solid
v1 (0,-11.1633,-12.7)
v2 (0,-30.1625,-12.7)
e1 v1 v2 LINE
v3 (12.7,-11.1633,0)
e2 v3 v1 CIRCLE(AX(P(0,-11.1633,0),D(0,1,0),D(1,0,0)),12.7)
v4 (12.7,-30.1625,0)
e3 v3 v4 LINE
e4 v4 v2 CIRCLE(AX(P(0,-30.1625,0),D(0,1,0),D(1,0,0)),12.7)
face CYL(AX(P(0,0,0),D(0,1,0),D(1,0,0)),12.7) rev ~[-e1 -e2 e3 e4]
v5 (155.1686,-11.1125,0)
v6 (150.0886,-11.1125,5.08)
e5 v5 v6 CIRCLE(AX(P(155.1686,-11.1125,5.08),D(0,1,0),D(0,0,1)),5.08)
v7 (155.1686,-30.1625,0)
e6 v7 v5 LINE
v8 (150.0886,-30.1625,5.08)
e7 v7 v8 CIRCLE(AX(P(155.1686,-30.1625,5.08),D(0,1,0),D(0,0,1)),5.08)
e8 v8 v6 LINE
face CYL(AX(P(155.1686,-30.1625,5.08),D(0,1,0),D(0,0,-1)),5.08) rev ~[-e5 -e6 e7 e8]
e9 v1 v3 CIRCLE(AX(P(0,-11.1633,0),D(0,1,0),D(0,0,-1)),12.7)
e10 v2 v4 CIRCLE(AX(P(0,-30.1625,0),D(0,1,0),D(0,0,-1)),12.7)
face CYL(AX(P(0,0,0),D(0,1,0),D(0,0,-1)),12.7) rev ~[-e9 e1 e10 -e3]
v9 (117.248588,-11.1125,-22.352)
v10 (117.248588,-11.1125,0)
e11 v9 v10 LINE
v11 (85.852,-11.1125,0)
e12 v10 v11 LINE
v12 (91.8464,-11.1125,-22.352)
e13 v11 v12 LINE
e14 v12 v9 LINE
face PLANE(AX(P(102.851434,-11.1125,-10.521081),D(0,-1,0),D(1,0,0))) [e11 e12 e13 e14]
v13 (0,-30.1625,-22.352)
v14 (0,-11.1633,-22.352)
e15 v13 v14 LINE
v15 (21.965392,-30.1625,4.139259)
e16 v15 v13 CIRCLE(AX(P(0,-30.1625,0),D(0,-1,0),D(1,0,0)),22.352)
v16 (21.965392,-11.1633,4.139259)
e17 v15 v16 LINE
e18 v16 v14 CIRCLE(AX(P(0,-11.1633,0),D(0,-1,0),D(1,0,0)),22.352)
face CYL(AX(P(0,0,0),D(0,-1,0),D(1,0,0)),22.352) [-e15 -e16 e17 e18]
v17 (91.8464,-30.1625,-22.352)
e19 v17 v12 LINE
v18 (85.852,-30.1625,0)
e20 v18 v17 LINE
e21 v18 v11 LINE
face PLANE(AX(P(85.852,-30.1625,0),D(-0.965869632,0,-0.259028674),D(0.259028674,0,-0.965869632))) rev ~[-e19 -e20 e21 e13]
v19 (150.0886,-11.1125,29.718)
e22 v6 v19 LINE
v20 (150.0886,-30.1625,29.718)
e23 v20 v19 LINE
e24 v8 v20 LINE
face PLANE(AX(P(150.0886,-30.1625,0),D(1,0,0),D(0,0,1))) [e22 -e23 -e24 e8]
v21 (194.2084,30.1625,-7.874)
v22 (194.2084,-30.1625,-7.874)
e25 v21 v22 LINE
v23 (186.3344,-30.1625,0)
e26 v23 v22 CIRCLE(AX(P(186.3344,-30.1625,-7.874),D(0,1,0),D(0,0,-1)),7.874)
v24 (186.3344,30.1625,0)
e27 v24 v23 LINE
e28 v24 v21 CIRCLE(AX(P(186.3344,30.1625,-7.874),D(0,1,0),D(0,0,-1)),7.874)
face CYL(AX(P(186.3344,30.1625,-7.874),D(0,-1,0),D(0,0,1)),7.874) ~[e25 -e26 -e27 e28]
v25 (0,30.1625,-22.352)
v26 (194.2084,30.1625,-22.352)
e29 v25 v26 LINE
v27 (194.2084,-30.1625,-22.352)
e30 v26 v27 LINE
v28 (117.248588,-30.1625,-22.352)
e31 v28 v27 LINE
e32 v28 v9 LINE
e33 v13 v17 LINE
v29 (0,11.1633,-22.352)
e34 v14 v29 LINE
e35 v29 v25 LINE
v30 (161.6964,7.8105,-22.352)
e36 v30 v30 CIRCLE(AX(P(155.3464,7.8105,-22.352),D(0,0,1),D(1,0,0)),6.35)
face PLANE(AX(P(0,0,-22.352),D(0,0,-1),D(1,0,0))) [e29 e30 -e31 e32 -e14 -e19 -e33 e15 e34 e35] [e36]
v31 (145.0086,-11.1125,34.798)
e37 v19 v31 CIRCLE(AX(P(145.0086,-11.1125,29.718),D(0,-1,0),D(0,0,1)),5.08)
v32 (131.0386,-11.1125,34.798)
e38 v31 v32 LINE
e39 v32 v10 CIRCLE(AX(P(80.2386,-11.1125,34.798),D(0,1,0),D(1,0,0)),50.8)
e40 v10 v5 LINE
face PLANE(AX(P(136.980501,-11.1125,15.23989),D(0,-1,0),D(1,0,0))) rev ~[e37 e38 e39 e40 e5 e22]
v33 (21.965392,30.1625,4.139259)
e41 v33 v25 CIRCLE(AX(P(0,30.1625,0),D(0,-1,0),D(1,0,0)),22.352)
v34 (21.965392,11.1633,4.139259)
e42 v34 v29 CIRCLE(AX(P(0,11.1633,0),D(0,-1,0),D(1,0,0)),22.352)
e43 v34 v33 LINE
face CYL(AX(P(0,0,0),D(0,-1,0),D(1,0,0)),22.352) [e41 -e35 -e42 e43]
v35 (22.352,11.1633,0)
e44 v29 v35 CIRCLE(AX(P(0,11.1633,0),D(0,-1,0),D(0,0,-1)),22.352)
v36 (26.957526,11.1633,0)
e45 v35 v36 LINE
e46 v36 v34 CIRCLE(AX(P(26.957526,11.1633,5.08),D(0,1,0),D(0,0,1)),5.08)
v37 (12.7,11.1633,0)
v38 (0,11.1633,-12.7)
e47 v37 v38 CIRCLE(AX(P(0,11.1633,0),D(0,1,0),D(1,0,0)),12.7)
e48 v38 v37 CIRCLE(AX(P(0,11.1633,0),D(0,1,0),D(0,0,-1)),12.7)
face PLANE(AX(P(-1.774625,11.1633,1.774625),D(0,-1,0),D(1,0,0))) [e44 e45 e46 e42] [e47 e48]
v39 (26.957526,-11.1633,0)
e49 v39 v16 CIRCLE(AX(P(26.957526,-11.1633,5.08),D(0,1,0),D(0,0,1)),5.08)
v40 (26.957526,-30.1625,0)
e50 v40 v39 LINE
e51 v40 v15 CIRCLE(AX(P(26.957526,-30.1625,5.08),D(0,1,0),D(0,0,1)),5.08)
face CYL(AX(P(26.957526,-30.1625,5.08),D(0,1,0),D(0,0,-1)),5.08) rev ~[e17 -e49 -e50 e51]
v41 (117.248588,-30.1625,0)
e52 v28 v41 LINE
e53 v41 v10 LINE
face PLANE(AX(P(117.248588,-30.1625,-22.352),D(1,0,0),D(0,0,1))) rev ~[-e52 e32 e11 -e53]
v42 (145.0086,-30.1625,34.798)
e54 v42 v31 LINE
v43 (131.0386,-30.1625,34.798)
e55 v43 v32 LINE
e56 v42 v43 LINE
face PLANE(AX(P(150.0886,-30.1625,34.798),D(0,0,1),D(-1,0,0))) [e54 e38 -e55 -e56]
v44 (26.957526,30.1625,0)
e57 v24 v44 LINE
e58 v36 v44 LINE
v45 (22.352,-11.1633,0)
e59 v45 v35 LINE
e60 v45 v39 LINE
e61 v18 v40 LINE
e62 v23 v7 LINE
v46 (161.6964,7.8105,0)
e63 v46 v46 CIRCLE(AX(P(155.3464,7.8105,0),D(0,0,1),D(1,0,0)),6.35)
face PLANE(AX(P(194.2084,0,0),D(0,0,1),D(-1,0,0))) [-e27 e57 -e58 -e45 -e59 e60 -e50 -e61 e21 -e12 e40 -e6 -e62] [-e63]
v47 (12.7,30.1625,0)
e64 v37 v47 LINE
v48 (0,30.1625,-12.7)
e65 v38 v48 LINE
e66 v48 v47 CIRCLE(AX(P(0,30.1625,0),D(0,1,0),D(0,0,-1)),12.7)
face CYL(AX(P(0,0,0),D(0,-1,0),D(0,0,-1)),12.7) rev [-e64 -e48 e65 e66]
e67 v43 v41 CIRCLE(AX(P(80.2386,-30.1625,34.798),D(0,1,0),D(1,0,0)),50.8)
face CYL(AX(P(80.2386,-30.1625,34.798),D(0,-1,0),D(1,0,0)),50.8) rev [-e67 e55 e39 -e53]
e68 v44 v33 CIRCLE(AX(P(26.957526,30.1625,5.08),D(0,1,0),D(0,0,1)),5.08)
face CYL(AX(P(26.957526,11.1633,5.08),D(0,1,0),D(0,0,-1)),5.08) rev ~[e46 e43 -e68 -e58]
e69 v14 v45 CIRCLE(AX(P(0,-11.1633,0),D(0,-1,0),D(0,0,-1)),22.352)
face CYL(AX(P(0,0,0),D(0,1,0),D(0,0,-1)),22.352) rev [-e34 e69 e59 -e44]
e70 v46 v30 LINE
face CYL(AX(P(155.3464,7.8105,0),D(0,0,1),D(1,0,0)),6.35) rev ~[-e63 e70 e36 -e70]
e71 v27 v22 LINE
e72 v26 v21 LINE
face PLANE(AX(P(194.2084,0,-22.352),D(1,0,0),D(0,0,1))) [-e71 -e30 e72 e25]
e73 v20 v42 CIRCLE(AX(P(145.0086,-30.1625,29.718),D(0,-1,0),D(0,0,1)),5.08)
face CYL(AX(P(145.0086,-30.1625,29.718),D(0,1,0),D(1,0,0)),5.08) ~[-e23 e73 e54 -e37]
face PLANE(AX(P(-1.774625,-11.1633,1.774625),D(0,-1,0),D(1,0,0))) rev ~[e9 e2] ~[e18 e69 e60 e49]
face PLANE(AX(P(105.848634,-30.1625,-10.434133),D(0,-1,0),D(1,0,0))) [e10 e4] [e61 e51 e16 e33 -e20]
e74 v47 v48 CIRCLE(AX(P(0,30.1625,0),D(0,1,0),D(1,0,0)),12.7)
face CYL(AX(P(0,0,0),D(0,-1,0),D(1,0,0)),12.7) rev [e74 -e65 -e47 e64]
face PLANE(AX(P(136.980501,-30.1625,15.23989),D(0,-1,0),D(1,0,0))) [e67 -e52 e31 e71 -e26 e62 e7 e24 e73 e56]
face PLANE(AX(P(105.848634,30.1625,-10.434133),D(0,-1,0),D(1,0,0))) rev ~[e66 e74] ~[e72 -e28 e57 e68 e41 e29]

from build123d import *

# Parameters (mm, degrees)
F1_DEPTH = 30.1625
F2_DEPTH = 11.1633
F4_DEPTH = 19.05
F5_DEPTH = 19.05
F6_R     = 7.874
F7_R     = 5.08
F8_R     = 6.35
F9_DEPTH = 22.353


with BuildPart() as f1:
    # F0 (on Front) → F1 (new body, symmetric)
    with BuildSketch(Plane.XZ):
        Polygon((97.8408, -22.352), (117.2485877871, -22.352), (117.2485877871, 0), (91.8464, 0), align=None)
        Polygon((91.8464, -22.352), (91.8464, 0), (85.852, 0), align=None)
        Polygon((64.8810639977, -22.352), (91.8464, -22.352), (85.852, 0), (43.9732931554, 0), align=None)
        with BuildLine():
            Line((0, -22.352), (64.8810639977, -22.352))
            Line((64.8810639977, -22.352), (43.9732931554, 0))
            Line((43.9732931554, 0), (22.352, 0))
            ThreePointArc((22.352, 0), (15.8052507731, -15.8052507731), (0, -22.352))
        make_face()
        with BuildLine():
            ThreePointArc((22.352, 0), (-15.8052507731, 15.8052507731), (0, -22.352))
            Line((0, -22.352), (0, -12.7))
            ThreePointArc((0, -12.7), (-8.9802561211, 8.9802561211), (12.7, 0))
            Line((12.7, 0), (22.352, 0))
        make_face()
        Polygon((91.8464, -22.352), (97.8408, -22.352), (91.8464, 0), align=None)
        Polygon((194.2084, -22.352), (194.2084, 0), (150.0886, 0), (131.0386, 0), (117.2485877871, 0), (117.2485877871, -22.352), align=None)
        with BuildLine():
            Line((0, -12.7), (0, -22.352))
            ThreePointArc((0, -22.352), (15.8052507731, -15.8052507731), (22.352, 0))
            Line((22.352, 0), (12.7, 0))
            ThreePointArc((12.7, 0), (8.9802561211, -8.9802561211), (0, -12.7))
        make_face()
    extrude(amount=F1_DEPTH, both=True)

    # F0 (on Front) → F2 (cut, symmetric)
    with BuildSketch(Plane.XZ):
        with BuildLine():
            ThreePointArc((22.352, 0), (-15.8052507731, 15.8052507731), (0, -22.352))
            Line((0, -22.352), (0, -12.7))
            ThreePointArc((0, -12.7), (-8.9802561211, 8.9802561211), (12.7, 0))
            Line((12.7, 0), (22.352, 0))
        make_face()
        with BuildLine():
            Line((0, -12.7), (0, -22.352))
            ThreePointArc((0, -22.352), (15.8052507731, -15.8052507731), (22.352, 0))
            Line((22.352, 0), (12.7, 0))
            ThreePointArc((12.7, 0), (8.9802561211, -8.9802561211), (0, -12.7))
        make_face()
    extrude(amount=F2_DEPTH, both=True, mode=Mode.SUBTRACT)

    # F3 (on face) → F4 (cut)
    with BuildSketch(Plane.XZ.offset(30.1625)):
        Polygon((117.2485877871, -22.352), (117.2485877871, 0), (85.852, 0), (91.8464, -22.352), align=None)
    extrude(amount=-F4_DEPTH, mode=Mode.SUBTRACT)

    # F3 (on face) → F5 (join)
    with BuildSketch(Plane.XZ.offset(30.1625)):
        with BuildLine():
            ThreePointArc((131.0386, 34.798), (127.4654323074, 16.0825969798), (117.2485877871, 0))
            Line((117.2485877871, 0), (150.0886, 0))
            Line((150.0886, 0), (150.0886, 34.798))
            Line((150.0886, 34.798), (131.0386, 34.798))
        make_face()
    extrude(amount=-F5_DEPTH)

    # F6
    f6_edges = [f1.edges().sort_by_distance(p)[0] for p in [
        (194.2084, 0, 0),
    ]]
    fillet(f6_edges, radius=F6_R)

    # F7
    f7_edges = [f1.edges().sort_by_distance(p)[0] for p in [
        (150.0886, -20.6375, 34.798),
        (150.0886, -20.6375, 0),
        (22.352, 20.6629, 0),
        (22.352, -20.6629, 0),
    ]]
    fillet(f7_edges, radius=F7_R)

    # F8 (on face) → F9 (cut, through all)
    with BuildSketch(Plane.XY):
        with Locations((155.3464, 7.8105)):
            Circle(F8_R)
    extrude(amount=-F9_DEPTH, mode=Mode.SUBTRACT)


solid = f1.part
